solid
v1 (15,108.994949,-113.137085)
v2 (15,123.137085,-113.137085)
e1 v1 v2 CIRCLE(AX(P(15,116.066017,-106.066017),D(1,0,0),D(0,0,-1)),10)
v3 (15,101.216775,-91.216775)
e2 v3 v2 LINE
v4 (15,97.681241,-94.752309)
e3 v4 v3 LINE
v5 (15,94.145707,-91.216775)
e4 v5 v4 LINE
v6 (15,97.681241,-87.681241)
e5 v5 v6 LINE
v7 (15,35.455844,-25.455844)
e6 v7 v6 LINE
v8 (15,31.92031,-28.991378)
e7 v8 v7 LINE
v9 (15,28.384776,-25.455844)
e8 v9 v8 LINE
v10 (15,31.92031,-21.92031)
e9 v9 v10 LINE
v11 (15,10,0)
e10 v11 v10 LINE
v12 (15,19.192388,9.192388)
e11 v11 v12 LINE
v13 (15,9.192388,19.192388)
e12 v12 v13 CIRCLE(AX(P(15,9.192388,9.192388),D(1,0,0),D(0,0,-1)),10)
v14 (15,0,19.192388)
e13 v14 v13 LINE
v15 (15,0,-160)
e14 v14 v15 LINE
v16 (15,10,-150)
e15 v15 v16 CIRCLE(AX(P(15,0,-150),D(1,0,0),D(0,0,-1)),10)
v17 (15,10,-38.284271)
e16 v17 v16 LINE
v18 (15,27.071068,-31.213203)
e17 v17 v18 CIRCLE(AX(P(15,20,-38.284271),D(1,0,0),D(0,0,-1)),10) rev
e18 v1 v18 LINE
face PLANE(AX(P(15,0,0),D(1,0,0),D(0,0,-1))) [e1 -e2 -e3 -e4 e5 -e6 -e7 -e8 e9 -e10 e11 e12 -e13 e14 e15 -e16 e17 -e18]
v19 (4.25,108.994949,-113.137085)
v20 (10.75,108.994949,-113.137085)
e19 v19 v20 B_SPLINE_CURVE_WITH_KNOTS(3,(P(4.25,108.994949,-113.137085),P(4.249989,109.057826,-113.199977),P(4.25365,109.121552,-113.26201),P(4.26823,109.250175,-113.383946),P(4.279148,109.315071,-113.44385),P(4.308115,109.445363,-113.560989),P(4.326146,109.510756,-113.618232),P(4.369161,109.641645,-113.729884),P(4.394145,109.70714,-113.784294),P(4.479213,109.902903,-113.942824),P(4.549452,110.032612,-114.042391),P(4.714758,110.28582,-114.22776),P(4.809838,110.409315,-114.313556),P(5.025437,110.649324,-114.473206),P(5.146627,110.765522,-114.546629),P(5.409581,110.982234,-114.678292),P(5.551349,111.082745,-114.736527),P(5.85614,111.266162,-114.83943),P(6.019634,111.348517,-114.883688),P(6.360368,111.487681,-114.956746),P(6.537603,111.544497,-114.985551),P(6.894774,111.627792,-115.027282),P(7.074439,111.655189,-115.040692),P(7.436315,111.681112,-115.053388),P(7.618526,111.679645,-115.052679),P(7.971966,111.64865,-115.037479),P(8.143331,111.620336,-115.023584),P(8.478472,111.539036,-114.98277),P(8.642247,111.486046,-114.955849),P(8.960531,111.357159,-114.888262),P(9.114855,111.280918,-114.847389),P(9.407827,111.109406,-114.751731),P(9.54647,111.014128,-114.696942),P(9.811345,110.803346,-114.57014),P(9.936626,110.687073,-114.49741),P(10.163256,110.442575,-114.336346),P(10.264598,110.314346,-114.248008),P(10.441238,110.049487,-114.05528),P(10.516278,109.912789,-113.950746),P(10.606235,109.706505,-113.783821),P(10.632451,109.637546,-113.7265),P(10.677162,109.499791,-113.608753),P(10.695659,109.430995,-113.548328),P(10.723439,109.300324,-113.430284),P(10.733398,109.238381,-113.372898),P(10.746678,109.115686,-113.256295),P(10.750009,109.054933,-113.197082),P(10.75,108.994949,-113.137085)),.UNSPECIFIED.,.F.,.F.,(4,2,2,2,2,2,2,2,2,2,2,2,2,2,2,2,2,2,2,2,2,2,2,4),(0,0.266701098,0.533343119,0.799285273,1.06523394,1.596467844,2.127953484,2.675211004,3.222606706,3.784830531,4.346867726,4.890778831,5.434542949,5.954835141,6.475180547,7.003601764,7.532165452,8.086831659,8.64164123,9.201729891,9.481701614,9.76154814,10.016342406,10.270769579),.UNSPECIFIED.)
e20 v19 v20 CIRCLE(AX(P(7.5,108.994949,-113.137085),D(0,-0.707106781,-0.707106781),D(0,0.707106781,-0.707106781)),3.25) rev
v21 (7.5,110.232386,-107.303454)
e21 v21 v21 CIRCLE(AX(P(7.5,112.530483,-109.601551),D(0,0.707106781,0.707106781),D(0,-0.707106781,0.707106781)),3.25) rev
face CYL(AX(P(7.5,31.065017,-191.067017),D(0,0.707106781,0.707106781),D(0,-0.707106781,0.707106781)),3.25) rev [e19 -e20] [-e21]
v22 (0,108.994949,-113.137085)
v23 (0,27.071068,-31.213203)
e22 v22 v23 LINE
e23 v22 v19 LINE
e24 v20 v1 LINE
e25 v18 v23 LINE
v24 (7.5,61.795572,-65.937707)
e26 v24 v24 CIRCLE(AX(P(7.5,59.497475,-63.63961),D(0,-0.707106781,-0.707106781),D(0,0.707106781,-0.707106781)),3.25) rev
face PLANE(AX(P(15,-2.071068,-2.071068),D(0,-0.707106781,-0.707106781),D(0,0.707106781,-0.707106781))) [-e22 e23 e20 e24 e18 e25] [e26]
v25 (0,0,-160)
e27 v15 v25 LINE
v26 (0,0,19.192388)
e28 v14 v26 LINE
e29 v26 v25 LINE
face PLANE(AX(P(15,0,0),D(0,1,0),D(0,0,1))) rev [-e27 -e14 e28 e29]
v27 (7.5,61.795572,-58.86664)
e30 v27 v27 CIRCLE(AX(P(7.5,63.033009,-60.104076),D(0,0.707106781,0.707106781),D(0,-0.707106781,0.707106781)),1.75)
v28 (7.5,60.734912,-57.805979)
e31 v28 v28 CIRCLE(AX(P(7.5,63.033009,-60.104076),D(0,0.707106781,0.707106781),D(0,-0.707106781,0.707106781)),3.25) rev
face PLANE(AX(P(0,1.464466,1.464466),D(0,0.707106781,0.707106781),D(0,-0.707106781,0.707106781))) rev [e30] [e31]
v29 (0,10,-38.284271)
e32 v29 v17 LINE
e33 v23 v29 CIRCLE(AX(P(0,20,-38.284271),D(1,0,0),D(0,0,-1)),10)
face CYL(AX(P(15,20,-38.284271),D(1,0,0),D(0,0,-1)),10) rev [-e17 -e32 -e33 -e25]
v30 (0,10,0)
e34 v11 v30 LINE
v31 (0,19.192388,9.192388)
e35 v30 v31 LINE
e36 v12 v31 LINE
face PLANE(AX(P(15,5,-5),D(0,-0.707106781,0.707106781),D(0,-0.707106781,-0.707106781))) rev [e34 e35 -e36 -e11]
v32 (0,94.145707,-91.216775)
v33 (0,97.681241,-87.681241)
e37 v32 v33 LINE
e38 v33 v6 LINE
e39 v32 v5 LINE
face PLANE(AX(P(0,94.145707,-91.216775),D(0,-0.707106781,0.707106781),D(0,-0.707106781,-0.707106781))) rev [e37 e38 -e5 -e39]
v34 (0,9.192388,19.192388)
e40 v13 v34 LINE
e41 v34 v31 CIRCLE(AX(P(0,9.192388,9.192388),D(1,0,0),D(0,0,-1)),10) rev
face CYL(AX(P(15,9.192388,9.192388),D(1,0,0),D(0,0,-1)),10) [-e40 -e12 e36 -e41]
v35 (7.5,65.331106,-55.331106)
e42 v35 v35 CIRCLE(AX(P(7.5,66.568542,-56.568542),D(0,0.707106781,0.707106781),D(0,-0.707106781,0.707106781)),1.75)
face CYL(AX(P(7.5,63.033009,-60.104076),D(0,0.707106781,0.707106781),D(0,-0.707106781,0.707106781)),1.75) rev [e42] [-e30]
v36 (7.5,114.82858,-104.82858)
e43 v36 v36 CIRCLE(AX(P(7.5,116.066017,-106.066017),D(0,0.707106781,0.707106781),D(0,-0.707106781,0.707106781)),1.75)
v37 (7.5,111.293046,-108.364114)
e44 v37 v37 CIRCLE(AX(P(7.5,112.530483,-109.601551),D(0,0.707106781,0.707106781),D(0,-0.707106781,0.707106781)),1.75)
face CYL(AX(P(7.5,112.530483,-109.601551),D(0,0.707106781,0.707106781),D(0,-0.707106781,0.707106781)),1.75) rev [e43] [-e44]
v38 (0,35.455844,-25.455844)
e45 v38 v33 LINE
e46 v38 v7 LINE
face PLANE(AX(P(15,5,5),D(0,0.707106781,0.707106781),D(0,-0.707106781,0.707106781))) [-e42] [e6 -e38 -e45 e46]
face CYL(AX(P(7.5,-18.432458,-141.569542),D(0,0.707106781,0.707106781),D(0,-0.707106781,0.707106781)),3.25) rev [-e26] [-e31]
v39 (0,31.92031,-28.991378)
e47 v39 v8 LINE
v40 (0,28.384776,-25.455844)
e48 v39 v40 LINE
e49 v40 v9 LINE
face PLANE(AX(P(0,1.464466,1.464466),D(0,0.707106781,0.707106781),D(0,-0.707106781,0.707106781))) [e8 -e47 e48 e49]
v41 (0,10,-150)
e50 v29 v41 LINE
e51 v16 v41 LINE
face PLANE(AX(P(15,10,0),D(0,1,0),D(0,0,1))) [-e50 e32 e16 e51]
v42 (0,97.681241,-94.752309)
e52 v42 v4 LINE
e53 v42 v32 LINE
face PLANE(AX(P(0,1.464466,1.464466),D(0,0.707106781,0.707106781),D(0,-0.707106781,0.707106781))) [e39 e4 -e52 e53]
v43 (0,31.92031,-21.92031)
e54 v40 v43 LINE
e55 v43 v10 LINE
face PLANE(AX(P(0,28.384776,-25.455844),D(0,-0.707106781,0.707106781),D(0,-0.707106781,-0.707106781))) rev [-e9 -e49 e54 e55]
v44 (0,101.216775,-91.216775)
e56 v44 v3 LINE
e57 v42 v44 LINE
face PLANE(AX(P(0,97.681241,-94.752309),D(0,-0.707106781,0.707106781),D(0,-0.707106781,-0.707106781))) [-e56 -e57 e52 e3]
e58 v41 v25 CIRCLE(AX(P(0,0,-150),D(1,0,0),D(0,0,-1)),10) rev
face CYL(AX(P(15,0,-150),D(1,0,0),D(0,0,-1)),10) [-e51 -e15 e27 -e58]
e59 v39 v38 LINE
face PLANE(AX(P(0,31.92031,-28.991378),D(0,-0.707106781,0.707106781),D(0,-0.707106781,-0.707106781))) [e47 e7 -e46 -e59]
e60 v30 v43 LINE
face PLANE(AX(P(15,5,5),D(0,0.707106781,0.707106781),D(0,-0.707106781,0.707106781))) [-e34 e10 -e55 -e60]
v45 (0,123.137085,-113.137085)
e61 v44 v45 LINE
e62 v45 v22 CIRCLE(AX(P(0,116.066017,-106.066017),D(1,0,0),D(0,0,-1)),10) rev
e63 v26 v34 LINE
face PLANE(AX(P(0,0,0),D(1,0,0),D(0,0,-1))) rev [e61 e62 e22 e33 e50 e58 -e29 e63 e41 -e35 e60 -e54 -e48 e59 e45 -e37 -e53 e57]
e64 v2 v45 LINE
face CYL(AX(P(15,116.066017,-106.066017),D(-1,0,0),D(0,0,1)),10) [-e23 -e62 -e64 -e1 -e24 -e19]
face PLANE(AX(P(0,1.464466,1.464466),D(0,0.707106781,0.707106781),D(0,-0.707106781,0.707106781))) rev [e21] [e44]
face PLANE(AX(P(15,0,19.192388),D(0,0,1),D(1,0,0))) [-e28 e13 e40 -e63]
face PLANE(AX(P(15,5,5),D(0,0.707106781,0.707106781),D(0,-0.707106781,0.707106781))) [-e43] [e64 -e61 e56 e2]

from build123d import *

# Parameters (mm, degrees)
SKETCH1_W           = 160
SKETCH1_H           = 10
SKETCH1_W_2         = 9.192388155
BOSS_EXTRUDE1_DEPTH = 15
CUT_EXTRUDE1_REACH  = 205.486
SKETCH2_R           = 3.25
SKETCH2_R_2         = 1.75
FILLET1_R           = 10
SKETCH2_3_W         = 15
SKETCH2_3_H         = 5
CUT_EXTRUDE2_DEPTH  = 5
SKETCH2_4_R         = 3.25
SKETCH2_4_R_2       = 1.75
BOSS_EXTRUDE2_DEPTH = 5


with BuildPart() as part:
    # Sketch1 → Boss-Extrude1 (new body)
    with BuildSketch(Plane(origin=(0, 0, 0), x_dir=(0, 0, -1), z_dir=(1, 0, 0))):
        Polygon((113.13708499, 123.13708499), (0, 10), (14.142135624, 10), (120.208152802, 116.066017178), align=None)
        with Locations((80, 5)):
            Rectangle(SKETCH1_W, SKETCH1_H)
        with Locations((-4.596194077, 5)):
            Rectangle(SKETCH1_W_2, SKETCH1_H)
        Polygon((0, 10), (-9.192388155, 19.192388155), (-9.192388155, 10), align=None)
        Polygon((-9.192388155, 0), (-9.192388155, 10), (-9.192388155, 19.192388155), (-19.192388155, 19.192388155), (-19.192388155, 0), align=None)
    extrude(amount=BOSS_EXTRUDE1_DEPTH)

    # Sketch2 → Cut-Extrude1 (cut, up to next)
    with BuildSketch(Plane(origin=(0, 5, 5), x_dir=(1, 0, 0), z_dir=(0, 0.7071067811865562, 0.7071067811865389)), mode=Mode.PRIVATE) as cut_extrude1_sk1:
        with Locations(Location((7.5, 157.071067812, 0), (0, 0, 270))):
            Circle(SKETCH2_R)
        with Locations((7.5, 157.071067812)):
            Circle(SKETCH2_R_2, mode=Mode.SUBTRACT)
    cut_extrude1_tool1 = extrude(cut_extrude1_sk1.sketch, amount=-CUT_EXTRUDE1_REACH, mode=Mode.PRIVATE) & part.part
    # Sketch2 → Cut-Extrude1 (cut, up to next)
    with BuildSketch(Plane(origin=(0, 5, 5), x_dir=(1, 0, 0), z_dir=(0, 0.7071067811865562, 0.7071067811865389)), mode=Mode.PRIVATE) as cut_extrude1_sk2:
        with Locations((7.5, 157.071067812)):
            Circle(SKETCH2_R_2)
    cut_extrude1_tool2 = extrude(cut_extrude1_sk2.sketch, amount=-CUT_EXTRUDE1_REACH, mode=Mode.PRIVATE) & part.part
    # Sketch2 → Cut-Extrude1 (cut, up to next)
    with BuildSketch(Plane(origin=(0, 5, 5), x_dir=(1, 0, 0), z_dir=(0, 0.7071067811865562, 0.7071067811865389)), mode=Mode.PRIVATE) as cut_extrude1_sk3:
        with Locations(Location((7.5, 87.071067812, 0), (0, 0, 270))):
            Circle(SKETCH2_R)
        with Locations((7.5, 87.071067812)):
            Circle(SKETCH2_R_2, mode=Mode.SUBTRACT)
    cut_extrude1_tool3 = extrude(cut_extrude1_sk3.sketch, amount=-CUT_EXTRUDE1_REACH, mode=Mode.PRIVATE) & part.part
    # Sketch2 → Cut-Extrude1 (cut, up to next)
    with BuildSketch(Plane(origin=(0, 5, 5), x_dir=(1, 0, 0), z_dir=(0, 0.7071067811865562, 0.7071067811865389)), mode=Mode.PRIVATE) as cut_extrude1_sk4:
        with Locations((7.5, 87.071067812)):
            Circle(SKETCH2_R_2)
    cut_extrude1_tool4 = extrude(cut_extrude1_sk4.sketch, amount=-CUT_EXTRUDE1_REACH, mode=Mode.PRIVATE) & part.part
    add(cut_extrude1_tool1.solids().sort_by_distance((7.5, 118.299114, -108.299114))[0], mode=Mode.SUBTRACT)
    add(cut_extrude1_tool2.solids().sort_by_distance((7.5, 116.066017, -106.066017))[0], mode=Mode.SUBTRACT)
    add(cut_extrude1_tool3.solids().sort_by_distance((7.5, 68.80164, -58.80164))[0], mode=Mode.SUBTRACT)
    add(cut_extrude1_tool4.solids().sort_by_distance((7.5, 66.568542, -56.568542))[0], mode=Mode.SUBTRACT)

    # Fillet1
    # the kernel refuses this fillet: 10 mm, written as the material it adds along each edge
    with BuildSketch(Plane(origin=(0, 10, -14.142135624), x_dir=(0, 0.707106781186544, -0.7071067811865511), z_dir=(1, 0, 0))) as fillet1_piece_1:
        with BuildLine():
            CenterArc((FILLET1_R * 2.41421356237, -FILLET1_R), FILLET1_R, 90, 135)
            Line((FILLET1_R * 1.70710678119, -FILLET1_R * 1.70710678119), (0, 0))
            Line((0, 0), (FILLET1_R * 2.41421356237, 0))
        make_face()
    extrude(amount=15)
    # the kernel refuses this fillet: 10 mm, written as the material it takes off along each edge
    with BuildSketch(Plane(origin=(-25, 116.066017178, -120.208152802), x_dir=(0, 0.7071067811865482, 0.7071067811865468), z_dir=(1, 0, 0))) as fillet1_2_piece_1:
        with BuildLine():
            CenterArc((FILLET1_R, FILLET1_R), FILLET1_R, 180, 90)
            Line((0, FILLET1_R), (0, 0))
            Line((0, 0), (FILLET1_R, 0))
        make_face()
    extrude(amount=65, mode=Mode.SUBTRACT)
    with BuildSketch(Plane(origin=(-25, 10, -160), x_dir=(0, -1, 0), z_dir=(1, 0, 0)), Plane(origin=(-25, 19.192388155, 19.192388155), x_dir=(0, 0, -1), z_dir=(1, 0, 0))) as fillet1_2_piece_2:
        with BuildLine():
            CenterArc((FILLET1_R, -FILLET1_R), FILLET1_R, 90, 90)
            Line((0, -FILLET1_R), (0, 0))
            Line((0, 0), (FILLET1_R, 0))
        make_face()
    extrude(amount=65, mode=Mode.SUBTRACT)

    # Sketch2<3> → Cut-Extrude2 (cut)
    with BuildSketch(Plane(origin=(0, 5, 5), x_dir=(1, 0, 0), z_dir=(0, 0.7071067811865562, 0.7071067811865389))):
        with Locations((7.5, 133.571067812)):
            Rectangle(SKETCH2_3_W, SKETCH2_3_H)
        with Locations((7.5, 40.571067812)):
            Rectangle(SKETCH2_3_W, SKETCH2_3_H)
    extrude(amount=-CUT_EXTRUDE2_DEPTH, mode=Mode.SUBTRACT)

    # Sketch2<4> → Boss-Extrude2 (add)
    # profile 1 of 2: a face of its own
    with BuildSketch(Plane(origin=(0, 5, 5), x_dir=(1, 0, 0), z_dir=(0, 0.7071067811865562, 0.7071067811865389))):
        with Locations(Location((7.5, 87.071067812, 0), (0, 0, 270))):
            Circle(SKETCH2_4_R)
        with Locations(Location((7.5, 87.071067812, 0), (0, 0, 270))):
            Circle(SKETCH2_4_R_2, mode=Mode.SUBTRACT)
    # profile 2 of 2: a face of its own
    with BuildSketch(Plane(origin=(0, 5, 5), x_dir=(1, 0, 0), z_dir=(0, 0.7071067811865562, 0.7071067811865389))):
        with Locations(Location((7.5, 157.071067812, 0), (0, 0, 270))):
            Circle(SKETCH2_4_R)
        with Locations(Location((7.5, 157.071067812, 0), (0, 0, 270))):
            Circle(SKETCH2_4_R_2, mode=Mode.SUBTRACT)
    extrude(amount=-BOSS_EXTRUDE2_DEPTH)


solid = part.part
